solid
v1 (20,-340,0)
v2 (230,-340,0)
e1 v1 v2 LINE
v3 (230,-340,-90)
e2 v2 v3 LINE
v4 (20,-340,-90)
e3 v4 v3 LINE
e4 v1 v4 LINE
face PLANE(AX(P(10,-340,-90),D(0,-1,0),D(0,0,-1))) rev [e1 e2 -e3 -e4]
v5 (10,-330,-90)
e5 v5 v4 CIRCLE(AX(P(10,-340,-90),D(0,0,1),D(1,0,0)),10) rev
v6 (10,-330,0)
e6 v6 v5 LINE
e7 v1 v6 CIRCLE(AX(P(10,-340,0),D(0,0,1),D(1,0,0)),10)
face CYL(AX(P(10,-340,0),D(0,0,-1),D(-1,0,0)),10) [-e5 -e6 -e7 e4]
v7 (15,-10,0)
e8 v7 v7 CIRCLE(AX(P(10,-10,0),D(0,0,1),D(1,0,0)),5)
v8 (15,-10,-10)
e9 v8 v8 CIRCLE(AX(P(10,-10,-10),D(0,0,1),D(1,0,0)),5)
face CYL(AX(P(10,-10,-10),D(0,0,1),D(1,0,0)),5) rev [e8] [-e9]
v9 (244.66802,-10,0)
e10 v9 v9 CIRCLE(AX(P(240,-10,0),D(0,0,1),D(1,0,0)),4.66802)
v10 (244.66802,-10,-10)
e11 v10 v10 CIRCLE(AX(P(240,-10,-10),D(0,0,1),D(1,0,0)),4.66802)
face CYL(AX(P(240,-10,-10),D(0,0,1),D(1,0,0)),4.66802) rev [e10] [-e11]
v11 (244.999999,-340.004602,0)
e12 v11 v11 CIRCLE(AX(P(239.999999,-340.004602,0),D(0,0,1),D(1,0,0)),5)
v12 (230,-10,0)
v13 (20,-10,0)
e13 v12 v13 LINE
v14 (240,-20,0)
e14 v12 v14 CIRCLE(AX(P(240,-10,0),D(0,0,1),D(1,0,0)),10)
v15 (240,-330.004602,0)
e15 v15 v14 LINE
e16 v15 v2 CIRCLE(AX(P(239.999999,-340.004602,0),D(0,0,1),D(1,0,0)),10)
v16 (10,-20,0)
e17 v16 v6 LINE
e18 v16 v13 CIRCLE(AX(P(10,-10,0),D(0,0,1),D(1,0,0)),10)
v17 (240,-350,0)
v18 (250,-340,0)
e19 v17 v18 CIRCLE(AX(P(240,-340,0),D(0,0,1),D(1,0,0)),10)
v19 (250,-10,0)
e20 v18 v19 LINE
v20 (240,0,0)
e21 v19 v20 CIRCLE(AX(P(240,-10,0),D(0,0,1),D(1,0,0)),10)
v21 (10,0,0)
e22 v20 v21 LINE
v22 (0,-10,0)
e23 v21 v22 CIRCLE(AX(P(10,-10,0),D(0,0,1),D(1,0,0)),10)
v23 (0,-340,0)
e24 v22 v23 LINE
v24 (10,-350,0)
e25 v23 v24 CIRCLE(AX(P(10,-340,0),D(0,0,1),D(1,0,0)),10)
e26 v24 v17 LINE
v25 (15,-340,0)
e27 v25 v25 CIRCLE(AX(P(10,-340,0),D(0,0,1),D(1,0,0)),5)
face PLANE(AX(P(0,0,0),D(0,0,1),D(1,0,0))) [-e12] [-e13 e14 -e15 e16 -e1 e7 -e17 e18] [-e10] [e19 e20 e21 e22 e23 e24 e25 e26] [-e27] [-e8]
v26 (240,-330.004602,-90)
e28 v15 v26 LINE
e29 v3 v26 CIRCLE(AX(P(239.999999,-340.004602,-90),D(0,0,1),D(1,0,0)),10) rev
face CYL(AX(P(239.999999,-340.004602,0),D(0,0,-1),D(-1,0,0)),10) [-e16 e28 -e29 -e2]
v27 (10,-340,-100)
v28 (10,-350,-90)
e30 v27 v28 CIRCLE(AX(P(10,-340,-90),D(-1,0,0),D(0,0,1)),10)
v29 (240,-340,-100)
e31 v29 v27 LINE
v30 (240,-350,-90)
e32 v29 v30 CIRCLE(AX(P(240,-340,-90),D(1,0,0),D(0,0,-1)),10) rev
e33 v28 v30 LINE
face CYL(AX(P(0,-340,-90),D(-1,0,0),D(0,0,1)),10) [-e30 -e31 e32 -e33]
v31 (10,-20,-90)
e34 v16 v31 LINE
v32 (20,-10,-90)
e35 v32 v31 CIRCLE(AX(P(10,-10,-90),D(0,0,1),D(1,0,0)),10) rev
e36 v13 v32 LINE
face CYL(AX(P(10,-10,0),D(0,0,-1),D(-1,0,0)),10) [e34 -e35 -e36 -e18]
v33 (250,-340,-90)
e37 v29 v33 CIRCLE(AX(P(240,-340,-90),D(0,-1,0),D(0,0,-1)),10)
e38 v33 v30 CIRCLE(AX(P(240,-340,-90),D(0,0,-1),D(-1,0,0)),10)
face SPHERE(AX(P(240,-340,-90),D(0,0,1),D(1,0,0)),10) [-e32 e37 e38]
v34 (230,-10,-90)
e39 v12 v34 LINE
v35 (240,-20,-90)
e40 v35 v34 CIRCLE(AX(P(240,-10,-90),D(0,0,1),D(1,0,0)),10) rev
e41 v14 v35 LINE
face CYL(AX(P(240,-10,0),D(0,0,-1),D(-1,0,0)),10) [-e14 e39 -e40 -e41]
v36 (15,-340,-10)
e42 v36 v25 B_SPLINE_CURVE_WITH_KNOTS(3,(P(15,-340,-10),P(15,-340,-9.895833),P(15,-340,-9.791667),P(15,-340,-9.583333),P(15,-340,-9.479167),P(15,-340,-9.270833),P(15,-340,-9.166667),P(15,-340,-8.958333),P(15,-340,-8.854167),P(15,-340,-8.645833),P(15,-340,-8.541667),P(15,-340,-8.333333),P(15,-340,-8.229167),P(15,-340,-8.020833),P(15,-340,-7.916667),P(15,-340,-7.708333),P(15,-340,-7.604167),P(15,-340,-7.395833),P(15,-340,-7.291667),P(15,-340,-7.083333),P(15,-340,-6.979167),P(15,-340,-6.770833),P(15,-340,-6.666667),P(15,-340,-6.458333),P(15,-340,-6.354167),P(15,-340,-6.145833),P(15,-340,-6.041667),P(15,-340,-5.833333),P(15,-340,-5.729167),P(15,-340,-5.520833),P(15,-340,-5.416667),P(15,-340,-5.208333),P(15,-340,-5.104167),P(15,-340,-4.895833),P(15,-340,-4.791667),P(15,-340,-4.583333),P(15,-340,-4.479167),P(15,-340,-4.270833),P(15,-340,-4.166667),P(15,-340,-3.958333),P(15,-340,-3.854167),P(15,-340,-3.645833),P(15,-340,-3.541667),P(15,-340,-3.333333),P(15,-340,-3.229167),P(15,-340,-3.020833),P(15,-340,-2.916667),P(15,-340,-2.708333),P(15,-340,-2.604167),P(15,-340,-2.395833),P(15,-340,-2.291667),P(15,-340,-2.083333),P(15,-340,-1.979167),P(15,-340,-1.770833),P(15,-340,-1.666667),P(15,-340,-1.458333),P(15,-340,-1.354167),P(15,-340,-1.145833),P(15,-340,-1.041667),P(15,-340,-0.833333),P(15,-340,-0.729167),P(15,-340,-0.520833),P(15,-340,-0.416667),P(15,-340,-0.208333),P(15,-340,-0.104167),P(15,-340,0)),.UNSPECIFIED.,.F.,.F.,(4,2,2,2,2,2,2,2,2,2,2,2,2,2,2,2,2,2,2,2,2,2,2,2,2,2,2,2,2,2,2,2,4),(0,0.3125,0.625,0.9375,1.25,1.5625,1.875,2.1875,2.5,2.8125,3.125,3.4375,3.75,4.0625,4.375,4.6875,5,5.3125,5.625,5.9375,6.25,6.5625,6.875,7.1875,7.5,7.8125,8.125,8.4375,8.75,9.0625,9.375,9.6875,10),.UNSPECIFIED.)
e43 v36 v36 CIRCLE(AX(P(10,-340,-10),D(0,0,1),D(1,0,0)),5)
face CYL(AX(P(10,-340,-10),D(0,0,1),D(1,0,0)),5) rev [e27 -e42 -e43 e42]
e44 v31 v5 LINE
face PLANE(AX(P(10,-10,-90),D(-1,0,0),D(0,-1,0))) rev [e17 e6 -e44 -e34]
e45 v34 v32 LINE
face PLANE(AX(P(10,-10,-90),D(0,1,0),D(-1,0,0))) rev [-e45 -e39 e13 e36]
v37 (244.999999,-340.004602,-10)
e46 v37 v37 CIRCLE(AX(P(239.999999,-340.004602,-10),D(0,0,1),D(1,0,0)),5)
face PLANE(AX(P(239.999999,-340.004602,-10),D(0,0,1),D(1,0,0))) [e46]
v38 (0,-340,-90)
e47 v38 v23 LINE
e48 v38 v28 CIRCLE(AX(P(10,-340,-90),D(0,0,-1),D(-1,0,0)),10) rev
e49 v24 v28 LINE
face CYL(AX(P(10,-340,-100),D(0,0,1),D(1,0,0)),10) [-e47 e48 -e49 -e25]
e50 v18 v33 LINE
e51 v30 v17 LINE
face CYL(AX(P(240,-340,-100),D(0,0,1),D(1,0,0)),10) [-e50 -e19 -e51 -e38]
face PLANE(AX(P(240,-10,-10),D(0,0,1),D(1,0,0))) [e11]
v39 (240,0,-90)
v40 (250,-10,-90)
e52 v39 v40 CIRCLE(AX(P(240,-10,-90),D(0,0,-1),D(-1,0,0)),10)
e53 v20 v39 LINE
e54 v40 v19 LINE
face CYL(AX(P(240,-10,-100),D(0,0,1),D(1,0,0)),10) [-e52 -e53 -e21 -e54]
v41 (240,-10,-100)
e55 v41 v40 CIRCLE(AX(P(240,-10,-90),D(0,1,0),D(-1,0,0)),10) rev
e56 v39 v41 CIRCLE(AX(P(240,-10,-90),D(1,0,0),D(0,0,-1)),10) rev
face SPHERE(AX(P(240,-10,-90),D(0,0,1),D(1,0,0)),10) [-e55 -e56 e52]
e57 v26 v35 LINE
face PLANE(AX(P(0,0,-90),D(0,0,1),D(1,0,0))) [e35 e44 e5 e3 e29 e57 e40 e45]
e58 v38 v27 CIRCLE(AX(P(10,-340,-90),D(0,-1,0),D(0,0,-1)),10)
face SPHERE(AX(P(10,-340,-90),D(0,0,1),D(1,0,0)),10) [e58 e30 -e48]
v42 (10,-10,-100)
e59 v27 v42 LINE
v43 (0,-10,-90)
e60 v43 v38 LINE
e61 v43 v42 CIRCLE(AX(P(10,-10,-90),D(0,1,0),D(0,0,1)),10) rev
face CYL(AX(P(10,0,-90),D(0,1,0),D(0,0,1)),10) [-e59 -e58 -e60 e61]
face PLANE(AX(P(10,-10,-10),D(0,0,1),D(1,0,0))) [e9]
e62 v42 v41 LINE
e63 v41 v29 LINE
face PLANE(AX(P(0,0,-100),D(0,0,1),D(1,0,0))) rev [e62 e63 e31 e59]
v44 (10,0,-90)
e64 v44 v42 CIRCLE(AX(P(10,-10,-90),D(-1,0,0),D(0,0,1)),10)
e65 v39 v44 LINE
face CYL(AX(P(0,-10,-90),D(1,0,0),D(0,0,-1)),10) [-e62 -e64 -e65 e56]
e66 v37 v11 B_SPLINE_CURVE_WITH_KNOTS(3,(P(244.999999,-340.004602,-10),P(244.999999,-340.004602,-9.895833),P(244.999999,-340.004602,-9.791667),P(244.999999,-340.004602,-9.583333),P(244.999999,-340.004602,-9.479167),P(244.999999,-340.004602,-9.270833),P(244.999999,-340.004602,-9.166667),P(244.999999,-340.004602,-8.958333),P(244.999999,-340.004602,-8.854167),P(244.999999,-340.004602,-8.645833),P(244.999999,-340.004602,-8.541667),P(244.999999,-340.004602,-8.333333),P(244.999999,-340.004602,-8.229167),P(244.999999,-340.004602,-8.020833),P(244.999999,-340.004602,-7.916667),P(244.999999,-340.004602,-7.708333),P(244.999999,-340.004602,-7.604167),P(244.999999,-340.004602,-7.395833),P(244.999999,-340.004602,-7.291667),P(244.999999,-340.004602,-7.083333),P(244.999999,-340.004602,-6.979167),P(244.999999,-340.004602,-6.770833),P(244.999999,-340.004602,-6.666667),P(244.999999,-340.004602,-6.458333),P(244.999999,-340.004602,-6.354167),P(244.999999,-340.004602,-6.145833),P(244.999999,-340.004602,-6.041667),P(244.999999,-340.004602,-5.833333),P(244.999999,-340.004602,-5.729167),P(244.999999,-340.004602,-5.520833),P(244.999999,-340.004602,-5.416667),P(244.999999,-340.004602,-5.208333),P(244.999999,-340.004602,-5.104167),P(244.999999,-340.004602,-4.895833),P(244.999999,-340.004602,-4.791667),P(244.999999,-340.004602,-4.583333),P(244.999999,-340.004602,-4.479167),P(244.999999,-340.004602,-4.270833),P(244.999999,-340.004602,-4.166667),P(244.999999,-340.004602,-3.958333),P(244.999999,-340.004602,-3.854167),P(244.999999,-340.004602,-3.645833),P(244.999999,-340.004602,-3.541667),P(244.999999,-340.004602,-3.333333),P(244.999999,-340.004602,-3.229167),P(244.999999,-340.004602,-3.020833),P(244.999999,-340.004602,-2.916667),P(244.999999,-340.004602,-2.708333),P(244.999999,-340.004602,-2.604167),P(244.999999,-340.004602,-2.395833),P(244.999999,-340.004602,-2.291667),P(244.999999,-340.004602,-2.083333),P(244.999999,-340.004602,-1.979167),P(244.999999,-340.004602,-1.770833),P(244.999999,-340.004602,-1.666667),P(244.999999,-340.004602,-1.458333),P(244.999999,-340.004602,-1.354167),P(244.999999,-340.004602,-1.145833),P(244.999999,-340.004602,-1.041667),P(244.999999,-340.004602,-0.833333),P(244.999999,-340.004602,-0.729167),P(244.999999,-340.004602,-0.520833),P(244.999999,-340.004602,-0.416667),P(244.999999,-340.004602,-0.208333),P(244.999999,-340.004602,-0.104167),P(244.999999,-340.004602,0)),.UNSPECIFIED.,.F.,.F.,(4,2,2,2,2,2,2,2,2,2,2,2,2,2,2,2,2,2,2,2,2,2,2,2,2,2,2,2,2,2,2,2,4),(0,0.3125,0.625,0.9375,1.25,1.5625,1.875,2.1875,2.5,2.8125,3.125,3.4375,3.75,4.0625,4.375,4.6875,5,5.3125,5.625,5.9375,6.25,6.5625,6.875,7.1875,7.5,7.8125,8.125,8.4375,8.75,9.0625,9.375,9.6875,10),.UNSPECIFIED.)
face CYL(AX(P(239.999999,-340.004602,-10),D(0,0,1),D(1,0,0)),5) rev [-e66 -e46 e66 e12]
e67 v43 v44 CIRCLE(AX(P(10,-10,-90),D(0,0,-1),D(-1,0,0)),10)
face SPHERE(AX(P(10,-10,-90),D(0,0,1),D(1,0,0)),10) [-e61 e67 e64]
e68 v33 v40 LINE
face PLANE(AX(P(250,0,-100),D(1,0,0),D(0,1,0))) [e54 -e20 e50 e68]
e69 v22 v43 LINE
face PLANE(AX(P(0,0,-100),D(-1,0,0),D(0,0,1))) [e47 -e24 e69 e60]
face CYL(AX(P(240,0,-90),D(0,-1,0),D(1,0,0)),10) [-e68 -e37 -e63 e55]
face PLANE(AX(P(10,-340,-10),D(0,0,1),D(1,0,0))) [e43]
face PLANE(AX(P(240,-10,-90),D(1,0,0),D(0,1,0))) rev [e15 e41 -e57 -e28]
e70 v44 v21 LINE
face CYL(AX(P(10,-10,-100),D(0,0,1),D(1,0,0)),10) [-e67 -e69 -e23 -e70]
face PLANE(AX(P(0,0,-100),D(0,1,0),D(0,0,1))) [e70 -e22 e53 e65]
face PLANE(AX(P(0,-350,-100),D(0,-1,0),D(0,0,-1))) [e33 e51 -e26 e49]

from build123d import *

# Parameters (mm, degrees)
SKETCH1_W           = 250
SKETCH1_H           = 350
BOSS_EXTRUDE1_DEPTH = 100
SKETCH2_W           = 230
SKETCH2_H           = 330
CUT_EXTRUDE1_DEPTH  = 90
FILLET1_R           = 10
SKETCH3_W           = 10
SKETCH3_H           = 10
BOSS_EXTRUDE2_DEPTH = 90
SKETCH4_W           = 10
SKETCH4_H           = 9.995398269
BOSS_EXTRUDE3_DEPTH = 90
SKETCH5_W           = 10
SKETCH5_H           = 10
BOSS_EXTRUDE4_DEPTH = 90
FILLET2_R           = 10
FILLET3_R           = 10
SKETCH6_R           = 4.668020142
CUT_EXTRUDE2_DEPTH  = 10
SKETCH7_R           = 5
CUT_EXTRUDE3_DEPTH  = 10
SKETCH8_R           = 5
CUT_EXTRUDE4_DEPTH  = 10
SKETCH9_R           = 5
CUT_EXTRUDE5_DEPTH  = 10


# Some blends are built 0.0001 mm under size
with BuildPart() as part:
    # Sketch1 → Boss-Extrude1 (new body)
    with BuildSketch(Plane.XY):
        with Locations((125, -175)):
            Rectangle(SKETCH1_W, SKETCH1_H)
    extrude(amount=-BOSS_EXTRUDE1_DEPTH)

    # Sketch2 → Cut-Extrude1 (cut)
    with BuildSketch(Plane.XY):
        with Locations((125, -175)):
            Rectangle(SKETCH2_W, SKETCH2_H)
    extrude(amount=-CUT_EXTRUDE1_DEPTH, mode=Mode.SUBTRACT)

    # Fillet1
    fillet1_edges = [part.edges().sort_by_distance(p)[0] for p in [
        (250, -175, -100),
        (125, 0, -100),
        (0, -175, -100),
        (125, -350, -100),
        (0, 0, -50),
        (250, 0, -50),
        (250, -350, -50),
        (0, -350, -50),
    ]]
    fillet(fillet1_edges, radius=FILLET1_R)

    # Sketch3 → Boss-Extrude2 (add)
    with BuildSketch(Plane.XY.offset(-90)):
        with Locations((15, -335)):
            Rectangle(SKETCH3_W, SKETCH3_H)
    extrude(amount=BOSS_EXTRUDE2_DEPTH)

    # Sketch4 → Boss-Extrude3 (add)
    with BuildSketch(Plane.XY.offset(-90)):
        with Locations((235, -335.002300866)):
            Rectangle(SKETCH4_W, SKETCH4_H)
    extrude(amount=BOSS_EXTRUDE3_DEPTH)

    # Sketch5 → Boss-Extrude4 (add)
    with BuildSketch(Plane.XY.offset(-90)):
        with Locations((235, -15)):
            Rectangle(SKETCH5_W, SKETCH5_H)
        with Locations((15, -15)):
            Rectangle(SKETCH5_W, SKETCH5_H)
    extrude(amount=BOSS_EXTRUDE4_DEPTH)

    # Fillet2
    fillet2_edges = [part.edges().sort_by_distance(p)[0] for p in [
        (230, -20, -45),
    ]]
    fillet(fillet2_edges, radius=FILLET2_R - 0.0001)  # a hair under: the kernel refuses the full size

    # Fillet3
    # the kernel refuses this fillet: 10 mm, written as the material it takes off along each edge
    with BuildSketch(Plane(origin=(230, -330.004601731, -90), x_dir=(1, 0, 0), z_dir=(0, 0, 1))) as fillet3_piece_1:
        with BuildLine():
            CenterArc((9.999998941, -10), FILLET3_R, 90, 89.973634023)
            Line((0, -9.995398269), (0, 0))
            Line((0, 0), (9.999998941, 0))
        make_face()
    extrude(amount=114.999997353, mode=Mode.SUBTRACT)
    with BuildSketch(Plane(origin=(20, -330, -90), x_dir=(0, -1, 0), z_dir=(0, 0, 1))) as fillet3_piece_2:
        with BuildLine():
            CenterArc((FILLET3_R, -FILLET3_R), FILLET3_R, 90, 90)
            Line((0, -FILLET3_R), (0, 0))
            Line((0, 0), (FILLET3_R, 0))
        make_face()
    extrude(amount=115, mode=Mode.SUBTRACT)
    with BuildSketch(Plane(origin=(20, -20, -90), x_dir=(0, 1, 0), z_dir=(0, 0, 1))) as fillet3_piece_3:
        with BuildLine():
            CenterArc((FILLET3_R, FILLET3_R), FILLET3_R, 180, 90)
            Line((0, FILLET3_R), (0, 0))
            Line((0, 0), (FILLET3_R, 0))
        make_face()
    extrude(amount=115, mode=Mode.SUBTRACT)

    # Sketch6 → Cut-Extrude2 (cut)
    with BuildSketch(Plane.XY):
        with Locations((240, -10)):
            Circle(SKETCH6_R)
    extrude(amount=-CUT_EXTRUDE2_DEPTH, mode=Mode.SUBTRACT)

    # Sketch7 → Cut-Extrude3 (cut)
    with BuildSketch(Plane.XY):
        with Locations((10, -10)):
            Circle(SKETCH7_R)
    extrude(amount=-CUT_EXTRUDE3_DEPTH, mode=Mode.SUBTRACT)

    # Sketch8 → Cut-Extrude4 (cut)
    with BuildSketch(Plane.XY):
        with Locations((239.999998941, -340.004601731)):
            Circle(SKETCH8_R)
    extrude(amount=-CUT_EXTRUDE4_DEPTH, mode=Mode.SUBTRACT)

    # Sketch9 → Cut-Extrude5 (cut)
    with BuildSketch(Plane.XY):
        with Locations((10, -340)):
            Circle(SKETCH9_R)
    extrude(amount=-CUT_EXTRUDE5_DEPTH, mode=Mode.SUBTRACT)


solid = part.part
